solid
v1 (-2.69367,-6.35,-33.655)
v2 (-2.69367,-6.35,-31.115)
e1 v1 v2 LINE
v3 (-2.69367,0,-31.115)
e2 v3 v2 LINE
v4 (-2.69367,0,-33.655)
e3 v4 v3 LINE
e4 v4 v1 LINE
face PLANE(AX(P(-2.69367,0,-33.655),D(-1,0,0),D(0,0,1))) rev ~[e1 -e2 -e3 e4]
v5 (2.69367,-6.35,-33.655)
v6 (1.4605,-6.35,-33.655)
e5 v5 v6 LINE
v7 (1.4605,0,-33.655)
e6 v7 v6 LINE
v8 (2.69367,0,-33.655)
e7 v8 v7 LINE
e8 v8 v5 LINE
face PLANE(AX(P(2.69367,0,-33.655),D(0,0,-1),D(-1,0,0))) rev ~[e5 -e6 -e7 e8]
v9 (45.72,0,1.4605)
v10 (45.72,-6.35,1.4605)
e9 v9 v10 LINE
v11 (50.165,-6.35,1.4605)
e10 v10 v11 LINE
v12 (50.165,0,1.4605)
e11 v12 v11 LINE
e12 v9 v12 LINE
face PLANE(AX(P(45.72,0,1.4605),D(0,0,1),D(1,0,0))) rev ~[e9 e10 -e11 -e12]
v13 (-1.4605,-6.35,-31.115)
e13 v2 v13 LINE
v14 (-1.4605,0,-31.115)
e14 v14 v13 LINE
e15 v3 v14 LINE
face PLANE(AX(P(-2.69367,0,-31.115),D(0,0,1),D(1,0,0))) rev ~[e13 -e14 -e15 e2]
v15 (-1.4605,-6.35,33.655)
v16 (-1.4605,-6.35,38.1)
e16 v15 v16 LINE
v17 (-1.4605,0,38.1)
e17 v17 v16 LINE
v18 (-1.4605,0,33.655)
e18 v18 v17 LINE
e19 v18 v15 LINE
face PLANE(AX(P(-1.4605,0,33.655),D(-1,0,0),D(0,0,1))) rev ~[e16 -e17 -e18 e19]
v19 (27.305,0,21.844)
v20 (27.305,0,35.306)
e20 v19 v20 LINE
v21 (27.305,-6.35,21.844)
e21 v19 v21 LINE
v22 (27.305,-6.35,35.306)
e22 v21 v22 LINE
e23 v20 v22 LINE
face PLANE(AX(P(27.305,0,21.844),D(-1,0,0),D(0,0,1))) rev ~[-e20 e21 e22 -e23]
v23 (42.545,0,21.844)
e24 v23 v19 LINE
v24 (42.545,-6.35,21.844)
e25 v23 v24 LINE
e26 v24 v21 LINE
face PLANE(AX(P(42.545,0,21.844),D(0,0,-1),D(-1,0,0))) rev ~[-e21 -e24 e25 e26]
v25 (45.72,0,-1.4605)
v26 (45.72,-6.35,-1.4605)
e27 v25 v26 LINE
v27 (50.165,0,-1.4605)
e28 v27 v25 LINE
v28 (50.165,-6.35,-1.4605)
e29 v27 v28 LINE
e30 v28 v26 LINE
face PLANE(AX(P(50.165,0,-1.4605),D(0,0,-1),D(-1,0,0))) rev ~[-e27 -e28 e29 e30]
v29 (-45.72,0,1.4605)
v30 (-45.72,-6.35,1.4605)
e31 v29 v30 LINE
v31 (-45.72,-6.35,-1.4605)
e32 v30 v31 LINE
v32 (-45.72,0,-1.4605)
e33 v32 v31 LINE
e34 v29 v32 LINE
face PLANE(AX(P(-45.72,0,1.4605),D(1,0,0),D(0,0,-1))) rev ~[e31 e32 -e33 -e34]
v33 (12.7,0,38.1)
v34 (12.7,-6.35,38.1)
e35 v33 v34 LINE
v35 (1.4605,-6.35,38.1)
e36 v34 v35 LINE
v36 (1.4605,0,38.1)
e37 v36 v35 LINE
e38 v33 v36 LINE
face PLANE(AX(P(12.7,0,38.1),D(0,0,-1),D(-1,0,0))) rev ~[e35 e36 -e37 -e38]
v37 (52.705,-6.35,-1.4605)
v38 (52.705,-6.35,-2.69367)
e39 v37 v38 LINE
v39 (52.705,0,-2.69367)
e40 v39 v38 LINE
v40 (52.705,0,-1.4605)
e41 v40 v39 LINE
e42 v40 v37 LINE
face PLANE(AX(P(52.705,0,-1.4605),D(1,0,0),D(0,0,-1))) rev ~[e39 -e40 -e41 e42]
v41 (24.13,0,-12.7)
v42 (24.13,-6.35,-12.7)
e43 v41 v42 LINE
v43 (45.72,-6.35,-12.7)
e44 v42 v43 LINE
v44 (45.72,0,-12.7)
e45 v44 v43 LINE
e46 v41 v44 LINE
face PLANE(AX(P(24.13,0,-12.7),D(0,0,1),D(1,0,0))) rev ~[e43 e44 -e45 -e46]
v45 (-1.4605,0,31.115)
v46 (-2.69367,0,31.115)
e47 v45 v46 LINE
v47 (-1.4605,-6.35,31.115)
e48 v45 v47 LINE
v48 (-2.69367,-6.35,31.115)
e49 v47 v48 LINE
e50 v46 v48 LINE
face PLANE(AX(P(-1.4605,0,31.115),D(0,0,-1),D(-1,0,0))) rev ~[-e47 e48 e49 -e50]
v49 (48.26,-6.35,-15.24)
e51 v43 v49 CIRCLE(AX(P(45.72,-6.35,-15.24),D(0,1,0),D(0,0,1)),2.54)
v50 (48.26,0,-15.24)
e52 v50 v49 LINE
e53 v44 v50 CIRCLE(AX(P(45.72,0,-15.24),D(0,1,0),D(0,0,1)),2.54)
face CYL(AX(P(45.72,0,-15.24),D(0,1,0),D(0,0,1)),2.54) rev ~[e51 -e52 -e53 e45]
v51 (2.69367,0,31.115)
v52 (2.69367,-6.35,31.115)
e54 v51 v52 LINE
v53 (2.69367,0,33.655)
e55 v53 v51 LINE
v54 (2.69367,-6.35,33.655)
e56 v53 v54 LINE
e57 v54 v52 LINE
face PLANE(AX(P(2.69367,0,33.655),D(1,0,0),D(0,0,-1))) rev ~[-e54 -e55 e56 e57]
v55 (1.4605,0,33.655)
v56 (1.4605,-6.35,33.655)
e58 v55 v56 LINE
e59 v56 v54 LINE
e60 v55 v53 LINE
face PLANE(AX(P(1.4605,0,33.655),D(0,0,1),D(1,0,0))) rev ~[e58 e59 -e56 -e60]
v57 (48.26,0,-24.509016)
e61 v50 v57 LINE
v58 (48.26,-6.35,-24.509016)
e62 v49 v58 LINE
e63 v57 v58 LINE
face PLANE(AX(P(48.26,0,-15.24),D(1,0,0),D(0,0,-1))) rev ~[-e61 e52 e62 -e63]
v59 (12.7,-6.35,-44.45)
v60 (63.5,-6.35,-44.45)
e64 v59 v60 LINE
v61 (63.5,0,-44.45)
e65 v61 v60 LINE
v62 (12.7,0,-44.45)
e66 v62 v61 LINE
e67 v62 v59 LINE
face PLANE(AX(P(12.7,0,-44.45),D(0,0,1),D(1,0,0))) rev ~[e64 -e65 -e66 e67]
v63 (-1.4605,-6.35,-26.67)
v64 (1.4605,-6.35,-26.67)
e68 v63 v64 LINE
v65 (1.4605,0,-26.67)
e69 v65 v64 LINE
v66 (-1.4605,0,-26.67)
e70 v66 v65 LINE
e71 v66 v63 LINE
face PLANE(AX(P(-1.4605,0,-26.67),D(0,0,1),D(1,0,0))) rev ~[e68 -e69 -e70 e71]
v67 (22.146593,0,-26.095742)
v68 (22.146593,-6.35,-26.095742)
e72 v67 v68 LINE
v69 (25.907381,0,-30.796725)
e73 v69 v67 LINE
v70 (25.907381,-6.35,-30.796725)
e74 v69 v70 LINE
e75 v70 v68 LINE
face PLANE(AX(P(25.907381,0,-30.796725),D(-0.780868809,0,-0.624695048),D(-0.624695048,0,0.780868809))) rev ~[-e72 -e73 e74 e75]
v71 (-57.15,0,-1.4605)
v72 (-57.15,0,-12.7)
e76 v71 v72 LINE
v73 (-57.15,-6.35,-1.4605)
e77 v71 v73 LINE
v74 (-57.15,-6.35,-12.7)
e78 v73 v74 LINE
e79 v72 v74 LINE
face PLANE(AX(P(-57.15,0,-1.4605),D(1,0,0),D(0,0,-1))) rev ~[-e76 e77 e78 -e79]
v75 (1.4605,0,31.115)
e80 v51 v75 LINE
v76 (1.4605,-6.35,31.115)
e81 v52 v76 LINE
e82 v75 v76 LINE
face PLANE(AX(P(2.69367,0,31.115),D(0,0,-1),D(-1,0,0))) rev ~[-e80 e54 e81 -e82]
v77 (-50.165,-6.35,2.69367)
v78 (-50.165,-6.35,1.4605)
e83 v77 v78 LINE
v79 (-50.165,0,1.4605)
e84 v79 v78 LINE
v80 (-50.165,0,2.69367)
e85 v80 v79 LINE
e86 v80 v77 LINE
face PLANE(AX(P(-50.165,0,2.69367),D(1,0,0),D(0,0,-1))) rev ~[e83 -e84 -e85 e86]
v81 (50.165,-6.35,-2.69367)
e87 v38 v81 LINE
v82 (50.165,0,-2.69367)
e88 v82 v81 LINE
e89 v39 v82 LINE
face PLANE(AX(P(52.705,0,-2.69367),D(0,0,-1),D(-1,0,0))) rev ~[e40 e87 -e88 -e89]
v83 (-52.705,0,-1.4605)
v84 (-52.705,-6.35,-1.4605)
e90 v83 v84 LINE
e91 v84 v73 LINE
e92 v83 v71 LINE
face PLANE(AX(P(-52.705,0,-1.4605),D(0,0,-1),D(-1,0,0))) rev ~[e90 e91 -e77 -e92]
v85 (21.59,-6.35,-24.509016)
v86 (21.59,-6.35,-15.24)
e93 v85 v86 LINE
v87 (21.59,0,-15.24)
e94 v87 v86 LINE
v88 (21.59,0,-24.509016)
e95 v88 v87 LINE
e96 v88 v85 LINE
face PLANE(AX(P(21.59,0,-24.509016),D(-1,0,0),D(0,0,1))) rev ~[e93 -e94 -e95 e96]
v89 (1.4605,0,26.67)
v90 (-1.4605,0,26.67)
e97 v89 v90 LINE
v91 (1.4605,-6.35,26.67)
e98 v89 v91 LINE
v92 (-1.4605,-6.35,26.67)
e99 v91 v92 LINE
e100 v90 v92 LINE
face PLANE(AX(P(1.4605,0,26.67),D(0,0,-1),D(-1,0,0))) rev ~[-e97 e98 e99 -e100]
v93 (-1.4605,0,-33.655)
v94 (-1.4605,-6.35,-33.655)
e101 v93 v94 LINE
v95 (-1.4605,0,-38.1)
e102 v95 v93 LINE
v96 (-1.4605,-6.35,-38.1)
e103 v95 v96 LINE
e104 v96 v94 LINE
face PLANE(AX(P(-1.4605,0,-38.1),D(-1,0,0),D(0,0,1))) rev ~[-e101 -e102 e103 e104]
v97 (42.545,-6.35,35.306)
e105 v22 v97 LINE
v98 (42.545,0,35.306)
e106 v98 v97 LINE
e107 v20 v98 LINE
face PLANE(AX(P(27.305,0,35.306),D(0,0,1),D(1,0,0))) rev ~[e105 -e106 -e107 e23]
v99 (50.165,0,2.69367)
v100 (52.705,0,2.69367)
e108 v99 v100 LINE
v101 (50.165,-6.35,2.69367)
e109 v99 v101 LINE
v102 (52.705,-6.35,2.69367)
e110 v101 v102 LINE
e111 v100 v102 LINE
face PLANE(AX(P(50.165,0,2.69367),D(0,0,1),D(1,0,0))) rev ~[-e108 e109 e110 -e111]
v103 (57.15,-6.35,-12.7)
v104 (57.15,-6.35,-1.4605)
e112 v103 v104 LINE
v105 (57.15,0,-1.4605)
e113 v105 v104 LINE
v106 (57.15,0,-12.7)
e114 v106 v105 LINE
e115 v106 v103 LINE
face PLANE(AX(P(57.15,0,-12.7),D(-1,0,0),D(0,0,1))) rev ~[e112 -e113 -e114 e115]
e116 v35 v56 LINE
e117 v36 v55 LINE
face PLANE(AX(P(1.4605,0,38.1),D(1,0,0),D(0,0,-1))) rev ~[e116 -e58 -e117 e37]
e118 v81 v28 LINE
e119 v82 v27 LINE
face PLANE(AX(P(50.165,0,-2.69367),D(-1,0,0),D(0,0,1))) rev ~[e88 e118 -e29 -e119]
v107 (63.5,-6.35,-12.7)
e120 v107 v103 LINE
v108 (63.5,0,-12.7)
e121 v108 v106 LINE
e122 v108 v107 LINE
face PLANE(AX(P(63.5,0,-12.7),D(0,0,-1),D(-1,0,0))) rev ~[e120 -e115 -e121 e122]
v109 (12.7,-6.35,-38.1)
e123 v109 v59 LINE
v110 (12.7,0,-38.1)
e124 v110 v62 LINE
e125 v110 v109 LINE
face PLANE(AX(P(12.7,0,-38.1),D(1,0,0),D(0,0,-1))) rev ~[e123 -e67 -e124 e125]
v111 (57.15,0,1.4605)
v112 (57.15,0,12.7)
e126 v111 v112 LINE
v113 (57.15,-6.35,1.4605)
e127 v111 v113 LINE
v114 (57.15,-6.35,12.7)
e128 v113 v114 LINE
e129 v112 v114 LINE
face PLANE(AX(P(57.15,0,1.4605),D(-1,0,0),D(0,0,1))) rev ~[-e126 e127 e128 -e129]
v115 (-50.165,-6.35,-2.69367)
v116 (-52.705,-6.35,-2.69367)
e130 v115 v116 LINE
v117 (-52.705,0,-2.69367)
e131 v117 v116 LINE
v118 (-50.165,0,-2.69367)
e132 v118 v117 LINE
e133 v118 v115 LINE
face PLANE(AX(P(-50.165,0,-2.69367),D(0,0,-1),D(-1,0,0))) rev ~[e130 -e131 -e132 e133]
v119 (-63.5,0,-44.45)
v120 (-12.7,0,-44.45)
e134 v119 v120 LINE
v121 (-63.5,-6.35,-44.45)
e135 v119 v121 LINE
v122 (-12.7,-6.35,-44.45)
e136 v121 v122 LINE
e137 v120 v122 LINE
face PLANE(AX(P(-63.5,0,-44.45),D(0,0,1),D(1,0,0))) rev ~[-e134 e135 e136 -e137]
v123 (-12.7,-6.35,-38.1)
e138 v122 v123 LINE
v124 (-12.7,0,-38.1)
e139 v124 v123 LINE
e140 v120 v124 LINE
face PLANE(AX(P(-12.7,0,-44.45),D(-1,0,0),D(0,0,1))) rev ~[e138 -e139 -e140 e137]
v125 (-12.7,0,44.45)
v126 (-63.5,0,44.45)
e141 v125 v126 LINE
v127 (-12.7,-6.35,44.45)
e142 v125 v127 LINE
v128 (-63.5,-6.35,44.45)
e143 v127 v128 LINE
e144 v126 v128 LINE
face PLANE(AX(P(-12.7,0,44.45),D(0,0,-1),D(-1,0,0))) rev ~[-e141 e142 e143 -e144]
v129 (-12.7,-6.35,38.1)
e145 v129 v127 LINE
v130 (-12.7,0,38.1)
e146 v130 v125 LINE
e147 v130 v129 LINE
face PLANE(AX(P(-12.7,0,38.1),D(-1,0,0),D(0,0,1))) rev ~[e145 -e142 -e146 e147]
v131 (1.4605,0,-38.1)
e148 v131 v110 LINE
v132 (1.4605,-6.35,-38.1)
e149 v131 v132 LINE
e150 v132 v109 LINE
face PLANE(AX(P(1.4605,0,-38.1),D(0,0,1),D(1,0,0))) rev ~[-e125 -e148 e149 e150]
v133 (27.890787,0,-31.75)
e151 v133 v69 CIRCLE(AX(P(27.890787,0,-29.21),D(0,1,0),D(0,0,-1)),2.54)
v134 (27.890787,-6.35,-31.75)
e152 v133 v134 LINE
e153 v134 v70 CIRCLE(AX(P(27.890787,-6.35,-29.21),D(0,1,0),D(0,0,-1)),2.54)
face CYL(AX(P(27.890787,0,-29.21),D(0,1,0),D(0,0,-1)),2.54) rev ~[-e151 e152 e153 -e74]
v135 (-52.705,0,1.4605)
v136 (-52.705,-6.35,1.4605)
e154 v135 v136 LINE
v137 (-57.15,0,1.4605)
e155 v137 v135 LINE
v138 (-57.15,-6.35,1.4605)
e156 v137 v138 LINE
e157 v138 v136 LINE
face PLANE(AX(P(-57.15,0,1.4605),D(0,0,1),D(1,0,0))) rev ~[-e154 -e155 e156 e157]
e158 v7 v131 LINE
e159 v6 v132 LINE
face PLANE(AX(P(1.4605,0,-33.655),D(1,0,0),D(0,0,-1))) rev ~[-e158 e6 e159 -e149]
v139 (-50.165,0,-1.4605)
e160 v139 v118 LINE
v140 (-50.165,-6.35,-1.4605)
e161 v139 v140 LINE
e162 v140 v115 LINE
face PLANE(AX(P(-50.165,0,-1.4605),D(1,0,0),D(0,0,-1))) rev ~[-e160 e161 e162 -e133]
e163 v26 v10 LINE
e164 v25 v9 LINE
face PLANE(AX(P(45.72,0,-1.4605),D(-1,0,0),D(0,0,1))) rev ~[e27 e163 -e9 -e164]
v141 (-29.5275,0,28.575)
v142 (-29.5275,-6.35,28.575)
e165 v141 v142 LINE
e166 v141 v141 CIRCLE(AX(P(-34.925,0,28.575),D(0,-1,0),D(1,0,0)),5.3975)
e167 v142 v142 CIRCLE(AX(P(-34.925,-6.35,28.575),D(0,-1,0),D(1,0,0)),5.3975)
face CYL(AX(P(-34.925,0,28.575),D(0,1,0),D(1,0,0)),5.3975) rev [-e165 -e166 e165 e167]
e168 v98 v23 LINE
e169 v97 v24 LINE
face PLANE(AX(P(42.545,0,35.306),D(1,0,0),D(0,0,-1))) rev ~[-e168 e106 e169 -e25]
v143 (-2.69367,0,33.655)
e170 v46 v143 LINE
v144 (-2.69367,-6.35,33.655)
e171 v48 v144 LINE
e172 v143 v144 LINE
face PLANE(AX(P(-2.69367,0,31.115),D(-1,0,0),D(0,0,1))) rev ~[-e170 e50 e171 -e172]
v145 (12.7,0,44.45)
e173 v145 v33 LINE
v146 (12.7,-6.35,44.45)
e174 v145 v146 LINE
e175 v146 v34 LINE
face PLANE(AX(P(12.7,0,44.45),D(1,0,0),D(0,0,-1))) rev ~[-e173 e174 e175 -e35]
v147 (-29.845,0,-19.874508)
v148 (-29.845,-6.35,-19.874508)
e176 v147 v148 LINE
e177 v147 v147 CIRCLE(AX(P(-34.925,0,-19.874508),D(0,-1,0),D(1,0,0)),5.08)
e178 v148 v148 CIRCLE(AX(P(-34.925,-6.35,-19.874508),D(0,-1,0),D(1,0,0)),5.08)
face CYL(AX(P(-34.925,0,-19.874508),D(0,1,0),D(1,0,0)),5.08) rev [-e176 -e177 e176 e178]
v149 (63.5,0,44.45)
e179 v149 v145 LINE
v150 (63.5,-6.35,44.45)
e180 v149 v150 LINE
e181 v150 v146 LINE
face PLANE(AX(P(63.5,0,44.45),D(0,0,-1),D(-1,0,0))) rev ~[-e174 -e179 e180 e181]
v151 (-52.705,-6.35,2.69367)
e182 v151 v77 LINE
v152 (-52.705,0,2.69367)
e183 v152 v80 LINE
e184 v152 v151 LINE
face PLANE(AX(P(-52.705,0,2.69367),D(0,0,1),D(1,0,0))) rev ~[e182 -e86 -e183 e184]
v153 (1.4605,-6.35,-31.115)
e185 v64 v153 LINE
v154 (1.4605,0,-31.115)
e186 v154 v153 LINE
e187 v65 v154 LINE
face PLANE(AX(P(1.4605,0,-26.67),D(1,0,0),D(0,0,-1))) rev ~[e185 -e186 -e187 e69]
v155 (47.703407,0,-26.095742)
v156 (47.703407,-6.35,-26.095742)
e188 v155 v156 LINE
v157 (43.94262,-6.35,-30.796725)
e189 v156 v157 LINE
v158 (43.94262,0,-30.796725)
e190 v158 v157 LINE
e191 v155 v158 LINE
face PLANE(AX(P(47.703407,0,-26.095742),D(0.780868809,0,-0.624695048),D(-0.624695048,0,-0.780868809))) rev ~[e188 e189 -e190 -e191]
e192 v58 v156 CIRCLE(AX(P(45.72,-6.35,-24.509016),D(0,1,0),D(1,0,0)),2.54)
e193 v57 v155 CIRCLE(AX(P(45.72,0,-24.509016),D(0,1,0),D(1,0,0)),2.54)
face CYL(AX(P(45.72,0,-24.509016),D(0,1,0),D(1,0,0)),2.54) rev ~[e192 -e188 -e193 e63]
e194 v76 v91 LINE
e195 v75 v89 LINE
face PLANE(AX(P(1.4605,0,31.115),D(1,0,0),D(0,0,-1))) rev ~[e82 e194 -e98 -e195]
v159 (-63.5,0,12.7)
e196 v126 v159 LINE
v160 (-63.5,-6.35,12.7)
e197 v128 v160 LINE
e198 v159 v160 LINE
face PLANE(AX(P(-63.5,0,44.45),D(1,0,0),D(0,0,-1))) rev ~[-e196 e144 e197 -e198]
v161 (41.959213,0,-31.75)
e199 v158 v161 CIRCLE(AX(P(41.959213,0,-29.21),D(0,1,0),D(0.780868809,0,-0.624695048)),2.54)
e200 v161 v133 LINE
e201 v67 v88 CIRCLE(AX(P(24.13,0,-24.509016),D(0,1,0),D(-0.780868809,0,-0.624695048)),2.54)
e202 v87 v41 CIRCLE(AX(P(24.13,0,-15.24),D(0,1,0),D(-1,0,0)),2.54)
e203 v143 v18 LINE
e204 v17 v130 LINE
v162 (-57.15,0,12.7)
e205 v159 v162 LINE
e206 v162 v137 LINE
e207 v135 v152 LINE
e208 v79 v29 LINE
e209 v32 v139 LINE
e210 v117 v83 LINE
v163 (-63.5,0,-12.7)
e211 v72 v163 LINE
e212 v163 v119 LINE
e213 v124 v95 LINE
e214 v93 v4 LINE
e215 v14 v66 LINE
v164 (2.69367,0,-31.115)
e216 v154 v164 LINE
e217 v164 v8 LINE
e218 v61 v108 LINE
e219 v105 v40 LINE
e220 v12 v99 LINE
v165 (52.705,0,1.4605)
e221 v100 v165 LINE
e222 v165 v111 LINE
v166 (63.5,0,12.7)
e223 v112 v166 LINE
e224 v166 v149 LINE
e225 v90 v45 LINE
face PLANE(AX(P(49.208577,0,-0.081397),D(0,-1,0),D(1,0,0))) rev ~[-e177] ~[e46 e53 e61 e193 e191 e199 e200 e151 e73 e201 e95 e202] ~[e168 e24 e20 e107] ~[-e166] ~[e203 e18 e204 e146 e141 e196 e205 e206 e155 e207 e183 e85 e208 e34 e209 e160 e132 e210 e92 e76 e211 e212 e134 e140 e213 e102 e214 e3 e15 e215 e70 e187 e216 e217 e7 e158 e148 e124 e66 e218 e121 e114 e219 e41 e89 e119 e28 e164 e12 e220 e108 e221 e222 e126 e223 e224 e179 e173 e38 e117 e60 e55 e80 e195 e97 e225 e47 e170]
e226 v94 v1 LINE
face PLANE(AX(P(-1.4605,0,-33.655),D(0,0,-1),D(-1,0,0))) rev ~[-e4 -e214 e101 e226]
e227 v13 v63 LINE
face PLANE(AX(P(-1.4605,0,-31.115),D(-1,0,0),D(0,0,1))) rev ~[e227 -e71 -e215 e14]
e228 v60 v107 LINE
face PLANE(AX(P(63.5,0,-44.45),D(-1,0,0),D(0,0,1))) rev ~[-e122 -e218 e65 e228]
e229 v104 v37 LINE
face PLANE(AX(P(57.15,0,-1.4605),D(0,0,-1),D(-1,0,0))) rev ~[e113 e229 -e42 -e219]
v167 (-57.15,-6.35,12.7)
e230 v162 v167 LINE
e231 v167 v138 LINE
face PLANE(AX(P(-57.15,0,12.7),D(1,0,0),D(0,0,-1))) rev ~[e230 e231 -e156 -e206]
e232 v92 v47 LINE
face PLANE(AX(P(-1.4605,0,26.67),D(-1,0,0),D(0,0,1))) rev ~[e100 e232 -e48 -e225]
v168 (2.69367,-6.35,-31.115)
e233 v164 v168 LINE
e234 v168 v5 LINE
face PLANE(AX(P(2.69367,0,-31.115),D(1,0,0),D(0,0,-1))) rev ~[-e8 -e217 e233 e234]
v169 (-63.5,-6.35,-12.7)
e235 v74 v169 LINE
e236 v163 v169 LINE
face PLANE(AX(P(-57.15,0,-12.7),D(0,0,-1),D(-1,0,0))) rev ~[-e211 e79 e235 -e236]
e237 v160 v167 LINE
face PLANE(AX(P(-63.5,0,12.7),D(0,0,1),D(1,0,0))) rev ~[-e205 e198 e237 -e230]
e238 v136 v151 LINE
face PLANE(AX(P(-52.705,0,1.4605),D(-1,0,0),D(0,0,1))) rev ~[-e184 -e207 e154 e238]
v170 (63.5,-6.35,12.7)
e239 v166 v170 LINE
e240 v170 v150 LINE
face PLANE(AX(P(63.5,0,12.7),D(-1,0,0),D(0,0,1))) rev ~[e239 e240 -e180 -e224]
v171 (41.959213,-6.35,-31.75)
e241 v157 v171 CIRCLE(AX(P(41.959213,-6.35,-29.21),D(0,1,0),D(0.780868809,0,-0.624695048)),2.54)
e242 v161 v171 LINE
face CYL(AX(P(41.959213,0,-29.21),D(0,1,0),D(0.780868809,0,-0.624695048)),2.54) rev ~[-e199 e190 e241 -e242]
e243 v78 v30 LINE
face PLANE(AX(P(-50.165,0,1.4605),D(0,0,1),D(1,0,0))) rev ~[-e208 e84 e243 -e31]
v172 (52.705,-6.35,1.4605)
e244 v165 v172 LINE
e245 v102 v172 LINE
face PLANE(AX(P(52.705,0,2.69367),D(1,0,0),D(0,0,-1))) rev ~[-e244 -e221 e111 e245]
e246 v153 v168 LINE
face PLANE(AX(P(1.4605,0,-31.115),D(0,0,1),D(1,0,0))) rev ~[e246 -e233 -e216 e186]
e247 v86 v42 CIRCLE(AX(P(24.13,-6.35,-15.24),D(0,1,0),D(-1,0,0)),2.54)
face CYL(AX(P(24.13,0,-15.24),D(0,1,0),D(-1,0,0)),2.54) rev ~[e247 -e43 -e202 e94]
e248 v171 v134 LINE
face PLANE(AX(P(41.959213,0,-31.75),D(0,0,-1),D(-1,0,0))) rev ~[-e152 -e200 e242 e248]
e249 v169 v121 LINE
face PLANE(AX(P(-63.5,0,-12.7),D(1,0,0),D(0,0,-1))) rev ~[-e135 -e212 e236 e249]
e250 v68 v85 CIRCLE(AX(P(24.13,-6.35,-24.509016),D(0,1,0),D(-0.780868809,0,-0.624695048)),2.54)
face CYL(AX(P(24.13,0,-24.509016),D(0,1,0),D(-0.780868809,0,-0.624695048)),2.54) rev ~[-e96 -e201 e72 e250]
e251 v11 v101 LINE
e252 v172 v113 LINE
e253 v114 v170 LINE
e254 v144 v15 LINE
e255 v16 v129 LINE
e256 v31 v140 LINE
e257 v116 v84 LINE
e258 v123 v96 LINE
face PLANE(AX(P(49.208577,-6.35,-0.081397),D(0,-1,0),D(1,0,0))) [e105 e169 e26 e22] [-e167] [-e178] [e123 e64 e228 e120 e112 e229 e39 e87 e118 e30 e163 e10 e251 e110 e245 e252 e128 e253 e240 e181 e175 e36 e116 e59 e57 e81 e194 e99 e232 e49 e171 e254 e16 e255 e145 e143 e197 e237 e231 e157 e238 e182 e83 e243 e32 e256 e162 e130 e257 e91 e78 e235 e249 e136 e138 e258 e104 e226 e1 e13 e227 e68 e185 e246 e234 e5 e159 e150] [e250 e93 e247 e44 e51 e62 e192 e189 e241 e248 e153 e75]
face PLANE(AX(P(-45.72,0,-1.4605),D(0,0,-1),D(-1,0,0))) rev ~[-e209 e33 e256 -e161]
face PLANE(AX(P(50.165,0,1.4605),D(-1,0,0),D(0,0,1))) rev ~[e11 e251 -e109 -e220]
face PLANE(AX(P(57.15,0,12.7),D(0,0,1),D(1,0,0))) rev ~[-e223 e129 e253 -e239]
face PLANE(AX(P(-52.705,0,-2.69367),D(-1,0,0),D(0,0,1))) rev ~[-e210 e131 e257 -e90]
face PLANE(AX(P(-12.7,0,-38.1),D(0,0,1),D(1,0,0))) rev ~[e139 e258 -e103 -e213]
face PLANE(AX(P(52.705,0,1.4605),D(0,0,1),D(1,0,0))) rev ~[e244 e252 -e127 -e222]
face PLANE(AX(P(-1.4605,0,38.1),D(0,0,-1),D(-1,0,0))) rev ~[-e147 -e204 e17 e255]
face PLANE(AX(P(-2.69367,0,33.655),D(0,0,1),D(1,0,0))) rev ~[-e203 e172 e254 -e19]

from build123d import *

# Parameters (mm, degrees)
F0_R     = 5.08
F0_R_2   = 5.3975
F1_DEPTH = 6.35


# Not quite as in the source:
# - a feature names something its author has since deleted; it is built from what else it names


with BuildPart() as f1:
    # F0 (on Front) → F1 (new body)
    with BuildSketch(Plane.XZ):
        with BuildLine():
            Line((34.9250002354, -44.45), (57.1500004709, -44.45))
            Line((57.1500004709, -44.45), (63.5, -44.45))
            Line((63.5, -44.45), (63.5, -12.7))
            Line((63.5, -12.7), (57.1500004709, -12.7))
            Line((57.1500004709, -12.7), (57.1500004709, -1.4605))
            Line((57.1500004709, -1.4605), (52.7050002354, -1.4605))
            Line((52.7050002354, -1.4605), (52.7050002354, -2.69367))
            Line((52.7050002354, -2.69367), (50.1650002354, -2.69367))
            Line((50.1650002354, -2.69367), (50.1650002354, -1.4605))
            Line((50.1650002354, -1.4605), (45.72, -1.4605))
            Line((45.72, -1.4605), (45.72, 1.4605))
            Line((45.72, 1.4605), (50.1650002354, 1.4605))
            Line((50.1650002354, 1.4605), (50.1650002354, 2.69367))
            Line((50.1650002354, 2.69367), (52.7050002354, 2.69367))
            Line((52.7050002354, 2.69367), (52.7050002354, 1.4605))
            Line((52.7050002354, 1.4605), (57.1500004709, 1.4605))
            Line((57.1500004709, 1.4605), (57.1500004709, 12.7))
            Line((57.1500004709, 12.7), (63.5, 12.7))
            Line((63.5, 12.7), (63.5, 44.45))
            Line((63.5, 44.45), (57.1500004709, 44.45))
            Line((57.1500004709, 44.45), (34.9250002354, 44.45))
            Line((34.9250002354, 44.45), (34.9250002354, 35.306))
            Line((34.9250002354, 35.306), (42.5450002354, 35.306))
            Line((42.5450002354, 35.306), (42.5450002354, 21.844))
            Line((42.5450002354, 21.844), (34.9250002354, 21.844))
            Line((34.9250002354, 21.844), (34.9250002354, -12.7))
            Line((34.9250002354, -12.7), (45.7200002354, -12.7))
            ThreePointArc((45.7200002354, -12.7), (47.5160514597, -13.4439487758), (48.2600002354, -15.24))
            Line((48.2600002354, -15.24), (48.2600002354, -24.5090161092))
            ThreePointArc((48.2600002354, -24.5090161092), (48.1168161661, -25.3497737405), (47.7034070114, -26.09574153))
            Line((47.7034070114, -26.09574153), (43.9426198988, -30.7967254208))
            ThreePointArc((43.9426198988, -30.7967254208), (43.0595124983, -31.4993102202), (41.9592131228, -31.75))
            Line((41.9592131228, -31.75), (34.9250002354, -31.75))
            Line((34.9250002354, -31.75), (34.9250002354, -44.45))
        make_face()
        with BuildLine():
            Line((12.7, -44.45), (34.9250002354, -44.45))
            Line((34.9250002354, -44.45), (34.9250002354, -31.75))
            Line((34.9250002354, -31.75), (27.8907873481, -31.75))
            ThreePointArc((27.8907873481, -31.75), (26.7904879726, -31.4993102202), (25.9073805721, -30.7967254208))
            Line((25.9073805721, -30.7967254208), (22.1465934595, -26.09574153))
            ThreePointArc((22.1465934595, -26.09574153), (21.7331843048, -25.3497737405), (21.5900002354, -24.5090161092))
            Line((21.5900002354, -24.5090161092), (21.5900002354, -15.24))
            ThreePointArc((21.5900002354, -15.24), (22.3339490112, -13.4439487758), (24.1300002354, -12.7))
            Line((24.1300002354, -12.7), (34.9250002354, -12.7))
            Line((34.9250002354, -12.7), (34.9250002354, 21.844))
            Line((34.9250002354, 21.844), (27.3050002354, 21.844))
            Line((27.3050002354, 21.844), (27.3050002354, 35.306))
            Line((27.3050002354, 35.306), (34.9250002354, 35.306))
            Line((34.9250002354, 35.306), (34.9250002354, 44.45))
            Line((34.9250002354, 44.45), (12.7, 44.45))
            Line((12.7, 44.45), (12.7, 38.1000004709))
            Line((12.7, 38.1000004709), (1.4605, 38.1000004709))
            Line((1.4605, 38.1000004709), (1.4605, 33.6550002354))
            Line((1.4605, 33.6550002354), (2.69367, 33.6550002354))
            Line((2.69367, 33.6550002354), (2.69367, 31.1150002354))
            Line((2.69367, 31.1150002354), (1.4605, 31.1150002354))
            Line((1.4605, 31.1150002354), (1.4605, 26.67))
            Line((1.4605, 26.67), (-1.4605, 26.67))
            Line((-1.4605, 26.67), (-1.4605, 31.1150002354))
            Line((-1.4605, 31.1150002354), (-2.69367, 31.1150002354))
            Line((-2.69367, 31.1150002354), (-2.69367, 33.6550002354))
            Line((-2.69367, 33.6550002354), (-1.4605, 33.6550002354))
            Line((-1.4605, 33.6550002354), (-1.4605, 38.1000004709))
            Line((-1.4605, 38.1000004709), (-12.7, 38.1000004709))
            Line((-12.7, 38.1000004709), (-12.7, 44.45))
            Line((-12.7, 44.45), (-57.1500004709, 44.45))
            Line((-57.1500004709, 44.45), (-63.5, 44.45))
            Line((-63.5, 44.45), (-63.5, 12.7))
            Line((-63.5, 12.7), (-57.1500004709, 12.7))
            Line((-57.1500004709, 12.7), (-57.1500004709, 1.4605))
            Line((-57.1500004709, 1.4605), (-52.7050002354, 1.4605))
            Line((-52.7050002354, 1.4605), (-52.7050002354, 2.69367))
            Line((-52.7050002354, 2.69367), (-50.1650002354, 2.69367))
            Line((-50.1650002354, 2.69367), (-50.1650002354, 1.4605))
            Line((-50.1650002354, 1.4605), (-45.72, 1.4605))
            Line((-45.72, 1.4605), (-45.72, -1.4605))
            Line((-45.72, -1.4605), (-50.1650002354, -1.4605))
            Line((-50.1650002354, -1.4605), (-50.1650002354, -2.69367))
            Line((-50.1650002354, -2.69367), (-52.7050002354, -2.69367))
            Line((-52.7050002354, -2.69367), (-52.7050002354, -1.4605))
            Line((-52.7050002354, -1.4605), (-57.1500004709, -1.4605))
            Line((-57.1500004709, -1.4605), (-57.1500004709, -2.69367))
            Line((-57.1500004709, -2.69367), (-57.1500004709, -12.7))
            Line((-57.1500004709, -12.7), (-63.5, -12.7))
            Line((-63.5, -12.7), (-63.5, -44.45))
            Line((-63.5, -44.45), (-57.1500004709, -44.45))
            Line((-57.1500004709, -44.45), (-12.7, -44.45))
            Line((-12.7, -44.45), (-12.7, -38.1000004709))
            Line((-12.7, -38.1000004709), (-1.4605, -38.1000004709))
            Line((-1.4605, -38.1000004709), (-1.4605, -33.6550002354))
            Line((-1.4605, -33.6550002354), (-2.69367, -33.6550002354))
            Line((-2.69367, -33.6550002354), (-2.69367, -31.1150002354))
            Line((-2.69367, -31.1150002354), (-1.4605, -31.1150002354))
            Line((-1.4605, -31.1150002354), (-1.4605, -26.67))
            Line((-1.4605, -26.67), (1.4605, -26.67))
            Line((1.4605, -26.67), (1.4605, -31.1150002354))
            Line((1.4605, -31.1150002354), (2.69367, -31.1150002354))
            Line((2.69367, -31.1150002354), (2.69367, -33.6550002354))
            Line((2.69367, -33.6550002354), (1.4605, -33.6550002354))
            Line((1.4605, -33.6550002354), (1.4605, -38.1000004709))
            Line((1.4605, -38.1000004709), (12.7, -38.1000004709))
            Line((12.7, -38.1000004709), (12.7, -44.45))
        make_face()
        with Locations((-34.9250002354, -19.8745080546)):
            Circle(F0_R, mode=Mode.SUBTRACT)
        with Locations((-34.9250002354, 28.575)):
            Circle(F0_R_2, mode=Mode.SUBTRACT)
    extrude(amount=F1_DEPTH)


solid = f1.part
